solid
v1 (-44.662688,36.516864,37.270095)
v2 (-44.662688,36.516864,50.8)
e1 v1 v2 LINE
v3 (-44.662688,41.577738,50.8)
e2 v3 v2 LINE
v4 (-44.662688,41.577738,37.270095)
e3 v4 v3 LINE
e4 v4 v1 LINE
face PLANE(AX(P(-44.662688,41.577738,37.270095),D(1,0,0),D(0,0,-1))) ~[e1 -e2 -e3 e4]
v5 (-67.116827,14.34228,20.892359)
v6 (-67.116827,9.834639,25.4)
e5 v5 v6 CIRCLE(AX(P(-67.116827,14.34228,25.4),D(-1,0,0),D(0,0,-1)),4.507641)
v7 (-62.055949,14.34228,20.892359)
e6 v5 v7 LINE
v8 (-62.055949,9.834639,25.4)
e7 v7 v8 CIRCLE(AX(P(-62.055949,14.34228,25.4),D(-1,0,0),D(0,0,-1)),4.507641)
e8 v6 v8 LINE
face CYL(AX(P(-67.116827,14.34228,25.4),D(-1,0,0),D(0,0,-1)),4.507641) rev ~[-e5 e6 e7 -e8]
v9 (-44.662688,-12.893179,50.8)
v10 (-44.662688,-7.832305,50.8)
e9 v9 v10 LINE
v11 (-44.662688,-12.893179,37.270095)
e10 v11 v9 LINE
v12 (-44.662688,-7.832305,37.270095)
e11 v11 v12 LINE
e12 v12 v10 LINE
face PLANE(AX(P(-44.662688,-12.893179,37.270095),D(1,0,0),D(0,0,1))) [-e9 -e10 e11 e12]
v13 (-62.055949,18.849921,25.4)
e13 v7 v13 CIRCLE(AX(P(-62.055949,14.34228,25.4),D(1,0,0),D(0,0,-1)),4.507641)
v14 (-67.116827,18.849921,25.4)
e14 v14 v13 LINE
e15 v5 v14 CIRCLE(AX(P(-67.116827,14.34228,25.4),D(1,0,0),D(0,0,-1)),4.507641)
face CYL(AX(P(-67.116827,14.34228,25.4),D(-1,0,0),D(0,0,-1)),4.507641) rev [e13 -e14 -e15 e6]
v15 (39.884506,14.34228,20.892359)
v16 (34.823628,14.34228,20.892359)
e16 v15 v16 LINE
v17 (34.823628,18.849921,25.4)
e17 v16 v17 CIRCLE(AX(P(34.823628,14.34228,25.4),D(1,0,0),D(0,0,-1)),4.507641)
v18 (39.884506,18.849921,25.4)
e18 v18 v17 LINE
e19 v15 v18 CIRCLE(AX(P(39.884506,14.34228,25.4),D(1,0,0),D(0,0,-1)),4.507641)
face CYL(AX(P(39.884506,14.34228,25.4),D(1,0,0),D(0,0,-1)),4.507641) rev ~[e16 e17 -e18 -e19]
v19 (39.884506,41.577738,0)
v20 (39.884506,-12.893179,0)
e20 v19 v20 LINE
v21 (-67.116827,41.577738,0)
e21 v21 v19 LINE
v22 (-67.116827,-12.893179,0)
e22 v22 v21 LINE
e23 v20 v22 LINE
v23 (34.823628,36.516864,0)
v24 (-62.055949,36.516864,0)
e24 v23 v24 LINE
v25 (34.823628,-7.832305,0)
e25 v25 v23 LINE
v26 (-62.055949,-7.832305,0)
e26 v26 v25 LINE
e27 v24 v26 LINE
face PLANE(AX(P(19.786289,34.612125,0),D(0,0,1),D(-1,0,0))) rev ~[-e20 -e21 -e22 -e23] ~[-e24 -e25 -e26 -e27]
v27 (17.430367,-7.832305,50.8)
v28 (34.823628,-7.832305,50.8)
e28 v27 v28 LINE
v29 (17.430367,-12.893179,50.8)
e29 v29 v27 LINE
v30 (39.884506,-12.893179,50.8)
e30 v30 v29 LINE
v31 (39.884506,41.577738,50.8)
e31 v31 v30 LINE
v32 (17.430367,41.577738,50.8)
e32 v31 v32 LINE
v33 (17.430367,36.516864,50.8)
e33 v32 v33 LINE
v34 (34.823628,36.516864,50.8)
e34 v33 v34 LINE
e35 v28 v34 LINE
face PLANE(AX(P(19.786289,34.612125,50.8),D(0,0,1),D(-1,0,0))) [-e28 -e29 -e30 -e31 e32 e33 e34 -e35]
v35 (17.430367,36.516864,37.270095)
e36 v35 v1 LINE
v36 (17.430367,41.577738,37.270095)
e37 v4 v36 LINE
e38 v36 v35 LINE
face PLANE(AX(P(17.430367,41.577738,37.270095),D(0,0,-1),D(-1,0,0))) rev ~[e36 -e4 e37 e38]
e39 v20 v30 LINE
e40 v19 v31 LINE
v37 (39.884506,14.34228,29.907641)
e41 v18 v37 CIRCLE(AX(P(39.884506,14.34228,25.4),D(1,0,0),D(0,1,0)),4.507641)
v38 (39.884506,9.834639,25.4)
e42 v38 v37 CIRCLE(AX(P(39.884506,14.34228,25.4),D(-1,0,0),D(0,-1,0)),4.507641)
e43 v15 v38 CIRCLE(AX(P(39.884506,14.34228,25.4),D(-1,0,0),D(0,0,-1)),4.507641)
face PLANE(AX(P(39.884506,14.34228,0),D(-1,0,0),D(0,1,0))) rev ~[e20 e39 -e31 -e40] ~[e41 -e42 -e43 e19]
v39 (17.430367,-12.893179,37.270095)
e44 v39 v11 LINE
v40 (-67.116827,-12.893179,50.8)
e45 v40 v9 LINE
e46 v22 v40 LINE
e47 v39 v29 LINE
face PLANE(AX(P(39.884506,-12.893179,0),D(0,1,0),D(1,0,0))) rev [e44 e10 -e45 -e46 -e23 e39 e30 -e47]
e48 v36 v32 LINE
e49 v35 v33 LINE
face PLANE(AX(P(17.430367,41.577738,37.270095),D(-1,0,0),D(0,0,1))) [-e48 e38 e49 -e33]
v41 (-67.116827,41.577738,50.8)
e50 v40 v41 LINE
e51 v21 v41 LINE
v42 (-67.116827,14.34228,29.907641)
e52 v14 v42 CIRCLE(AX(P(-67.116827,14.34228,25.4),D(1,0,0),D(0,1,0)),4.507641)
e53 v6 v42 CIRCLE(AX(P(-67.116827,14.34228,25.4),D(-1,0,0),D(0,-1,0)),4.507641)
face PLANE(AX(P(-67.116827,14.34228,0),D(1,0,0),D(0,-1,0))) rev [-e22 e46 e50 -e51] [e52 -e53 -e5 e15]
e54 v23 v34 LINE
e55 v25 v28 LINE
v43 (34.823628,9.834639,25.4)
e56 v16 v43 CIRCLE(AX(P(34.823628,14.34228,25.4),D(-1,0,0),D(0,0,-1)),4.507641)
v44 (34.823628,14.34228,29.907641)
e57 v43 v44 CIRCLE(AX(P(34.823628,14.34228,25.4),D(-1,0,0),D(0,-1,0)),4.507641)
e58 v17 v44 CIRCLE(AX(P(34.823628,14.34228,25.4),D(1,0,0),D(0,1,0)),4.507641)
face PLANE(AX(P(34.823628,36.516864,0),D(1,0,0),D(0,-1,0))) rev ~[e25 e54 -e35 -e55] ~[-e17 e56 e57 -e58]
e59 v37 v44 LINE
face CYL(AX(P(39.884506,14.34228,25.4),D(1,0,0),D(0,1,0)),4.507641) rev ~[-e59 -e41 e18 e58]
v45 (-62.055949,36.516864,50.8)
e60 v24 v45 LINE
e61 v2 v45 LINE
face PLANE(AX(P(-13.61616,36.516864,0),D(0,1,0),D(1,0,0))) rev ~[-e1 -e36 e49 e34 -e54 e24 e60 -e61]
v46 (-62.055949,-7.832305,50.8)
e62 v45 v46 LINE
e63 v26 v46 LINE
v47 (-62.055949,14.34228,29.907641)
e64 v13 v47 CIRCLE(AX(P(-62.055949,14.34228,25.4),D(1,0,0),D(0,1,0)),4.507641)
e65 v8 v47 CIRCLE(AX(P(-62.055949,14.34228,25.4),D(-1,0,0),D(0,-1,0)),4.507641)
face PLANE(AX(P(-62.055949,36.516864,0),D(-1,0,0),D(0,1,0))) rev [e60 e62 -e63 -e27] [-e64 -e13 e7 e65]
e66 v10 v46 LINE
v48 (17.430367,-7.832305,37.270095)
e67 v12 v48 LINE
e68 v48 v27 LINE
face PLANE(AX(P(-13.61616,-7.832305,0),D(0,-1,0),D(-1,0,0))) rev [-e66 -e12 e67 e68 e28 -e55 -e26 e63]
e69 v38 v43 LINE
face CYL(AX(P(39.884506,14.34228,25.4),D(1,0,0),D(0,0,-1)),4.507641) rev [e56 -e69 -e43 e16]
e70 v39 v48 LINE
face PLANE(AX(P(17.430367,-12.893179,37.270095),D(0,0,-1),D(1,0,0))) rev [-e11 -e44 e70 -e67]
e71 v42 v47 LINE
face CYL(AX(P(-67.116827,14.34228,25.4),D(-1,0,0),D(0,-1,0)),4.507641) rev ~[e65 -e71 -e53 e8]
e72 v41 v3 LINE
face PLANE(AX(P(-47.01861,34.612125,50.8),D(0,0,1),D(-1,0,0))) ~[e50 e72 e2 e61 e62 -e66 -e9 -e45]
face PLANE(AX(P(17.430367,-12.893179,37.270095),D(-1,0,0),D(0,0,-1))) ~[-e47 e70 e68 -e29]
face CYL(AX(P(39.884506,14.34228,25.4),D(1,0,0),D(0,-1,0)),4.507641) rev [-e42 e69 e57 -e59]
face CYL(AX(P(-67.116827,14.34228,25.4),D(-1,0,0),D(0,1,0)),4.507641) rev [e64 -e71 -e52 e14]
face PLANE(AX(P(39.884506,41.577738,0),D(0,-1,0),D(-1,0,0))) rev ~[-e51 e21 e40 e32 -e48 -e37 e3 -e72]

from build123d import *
from build123d import SkipClean  # not in build123d's __all__

# Parameters (mm, degrees)
F1_DEPTH = 50.8
F2_W     = 31.0465274379
F2_H     = 13.5299048007
F3_DEPTH = 25.4
F5_DEPTH = 25.4


with BuildPart() as f1:
    # F0 (on Top) → F1 (new body)
    with BuildSketch(Plane.XY):
        Polygon((-62.0559491217, 14.3422799075), (-67.1168267727, 14.3422799075), (-67.1168267727, -12.8931785002), (-13.6161604896, -12.8931785002), (-13.6161604896, -7.8323045745), (-62.0559491217, -7.8323045745), align=None)
    extrude(amount=F1_DEPTH)

    # F2 (on face) → F3 (cut)
    with BuildSketch(Plane.XZ.offset(12.8931785002)):
        with Locations((-29.1394242086, 44.0350475997)):
            Rectangle(F2_W, F2_H)
    extrude(amount=-F3_DEPTH, mode=Mode.SUBTRACT)

    # F4 (on face) → F5 (cut)
    with BuildSketch(Plane(origin=(-67.1168267727, 0, 0), x_dir=(0, -1, 0), z_dir=(-1, 0, 0))):
        with BuildLine():
            ThreePointArc((-14.3422799075, 20.8923586581), (-11.1548961475, 22.21261624), (-9.8346385657, 25.4))
            ThreePointArc((-9.8346385657, 25.4), (-11.1548961475, 28.58738376), (-14.3422799075, 29.9076413419))
            Line((-14.3422799075, 29.9076413419), (-14.3422799075, 20.8923586581))
        make_face()
    extrude(amount=-F5_DEPTH, mode=Mode.SUBTRACT)

    # F6: F1 across face


with BuildPart() as f1_1:
    add(f1.part, clean=False)
    with SkipClean():  # cleaning this boolean's faces spoils the solid; the shape is the same uncleaned
        add(f1.part.mirror(Plane(origin=(-64.5863879472, 14.3422799075, 10.4461793291), x_dir=(-1, 0, 0), z_dir=(0, 1, 0))), clean=False)

    # F7: F1 across face


with BuildPart() as f1_2:
    add(f1_1.part, clean=False)
    add(f1_1.part.mirror(Plane(origin=(-13.6161604896, 39.0473013524, 18.6350475997), x_dir=(0, 1, 0), z_dir=(1, 0, 0))), clean=False)


solid = f1_2.part
